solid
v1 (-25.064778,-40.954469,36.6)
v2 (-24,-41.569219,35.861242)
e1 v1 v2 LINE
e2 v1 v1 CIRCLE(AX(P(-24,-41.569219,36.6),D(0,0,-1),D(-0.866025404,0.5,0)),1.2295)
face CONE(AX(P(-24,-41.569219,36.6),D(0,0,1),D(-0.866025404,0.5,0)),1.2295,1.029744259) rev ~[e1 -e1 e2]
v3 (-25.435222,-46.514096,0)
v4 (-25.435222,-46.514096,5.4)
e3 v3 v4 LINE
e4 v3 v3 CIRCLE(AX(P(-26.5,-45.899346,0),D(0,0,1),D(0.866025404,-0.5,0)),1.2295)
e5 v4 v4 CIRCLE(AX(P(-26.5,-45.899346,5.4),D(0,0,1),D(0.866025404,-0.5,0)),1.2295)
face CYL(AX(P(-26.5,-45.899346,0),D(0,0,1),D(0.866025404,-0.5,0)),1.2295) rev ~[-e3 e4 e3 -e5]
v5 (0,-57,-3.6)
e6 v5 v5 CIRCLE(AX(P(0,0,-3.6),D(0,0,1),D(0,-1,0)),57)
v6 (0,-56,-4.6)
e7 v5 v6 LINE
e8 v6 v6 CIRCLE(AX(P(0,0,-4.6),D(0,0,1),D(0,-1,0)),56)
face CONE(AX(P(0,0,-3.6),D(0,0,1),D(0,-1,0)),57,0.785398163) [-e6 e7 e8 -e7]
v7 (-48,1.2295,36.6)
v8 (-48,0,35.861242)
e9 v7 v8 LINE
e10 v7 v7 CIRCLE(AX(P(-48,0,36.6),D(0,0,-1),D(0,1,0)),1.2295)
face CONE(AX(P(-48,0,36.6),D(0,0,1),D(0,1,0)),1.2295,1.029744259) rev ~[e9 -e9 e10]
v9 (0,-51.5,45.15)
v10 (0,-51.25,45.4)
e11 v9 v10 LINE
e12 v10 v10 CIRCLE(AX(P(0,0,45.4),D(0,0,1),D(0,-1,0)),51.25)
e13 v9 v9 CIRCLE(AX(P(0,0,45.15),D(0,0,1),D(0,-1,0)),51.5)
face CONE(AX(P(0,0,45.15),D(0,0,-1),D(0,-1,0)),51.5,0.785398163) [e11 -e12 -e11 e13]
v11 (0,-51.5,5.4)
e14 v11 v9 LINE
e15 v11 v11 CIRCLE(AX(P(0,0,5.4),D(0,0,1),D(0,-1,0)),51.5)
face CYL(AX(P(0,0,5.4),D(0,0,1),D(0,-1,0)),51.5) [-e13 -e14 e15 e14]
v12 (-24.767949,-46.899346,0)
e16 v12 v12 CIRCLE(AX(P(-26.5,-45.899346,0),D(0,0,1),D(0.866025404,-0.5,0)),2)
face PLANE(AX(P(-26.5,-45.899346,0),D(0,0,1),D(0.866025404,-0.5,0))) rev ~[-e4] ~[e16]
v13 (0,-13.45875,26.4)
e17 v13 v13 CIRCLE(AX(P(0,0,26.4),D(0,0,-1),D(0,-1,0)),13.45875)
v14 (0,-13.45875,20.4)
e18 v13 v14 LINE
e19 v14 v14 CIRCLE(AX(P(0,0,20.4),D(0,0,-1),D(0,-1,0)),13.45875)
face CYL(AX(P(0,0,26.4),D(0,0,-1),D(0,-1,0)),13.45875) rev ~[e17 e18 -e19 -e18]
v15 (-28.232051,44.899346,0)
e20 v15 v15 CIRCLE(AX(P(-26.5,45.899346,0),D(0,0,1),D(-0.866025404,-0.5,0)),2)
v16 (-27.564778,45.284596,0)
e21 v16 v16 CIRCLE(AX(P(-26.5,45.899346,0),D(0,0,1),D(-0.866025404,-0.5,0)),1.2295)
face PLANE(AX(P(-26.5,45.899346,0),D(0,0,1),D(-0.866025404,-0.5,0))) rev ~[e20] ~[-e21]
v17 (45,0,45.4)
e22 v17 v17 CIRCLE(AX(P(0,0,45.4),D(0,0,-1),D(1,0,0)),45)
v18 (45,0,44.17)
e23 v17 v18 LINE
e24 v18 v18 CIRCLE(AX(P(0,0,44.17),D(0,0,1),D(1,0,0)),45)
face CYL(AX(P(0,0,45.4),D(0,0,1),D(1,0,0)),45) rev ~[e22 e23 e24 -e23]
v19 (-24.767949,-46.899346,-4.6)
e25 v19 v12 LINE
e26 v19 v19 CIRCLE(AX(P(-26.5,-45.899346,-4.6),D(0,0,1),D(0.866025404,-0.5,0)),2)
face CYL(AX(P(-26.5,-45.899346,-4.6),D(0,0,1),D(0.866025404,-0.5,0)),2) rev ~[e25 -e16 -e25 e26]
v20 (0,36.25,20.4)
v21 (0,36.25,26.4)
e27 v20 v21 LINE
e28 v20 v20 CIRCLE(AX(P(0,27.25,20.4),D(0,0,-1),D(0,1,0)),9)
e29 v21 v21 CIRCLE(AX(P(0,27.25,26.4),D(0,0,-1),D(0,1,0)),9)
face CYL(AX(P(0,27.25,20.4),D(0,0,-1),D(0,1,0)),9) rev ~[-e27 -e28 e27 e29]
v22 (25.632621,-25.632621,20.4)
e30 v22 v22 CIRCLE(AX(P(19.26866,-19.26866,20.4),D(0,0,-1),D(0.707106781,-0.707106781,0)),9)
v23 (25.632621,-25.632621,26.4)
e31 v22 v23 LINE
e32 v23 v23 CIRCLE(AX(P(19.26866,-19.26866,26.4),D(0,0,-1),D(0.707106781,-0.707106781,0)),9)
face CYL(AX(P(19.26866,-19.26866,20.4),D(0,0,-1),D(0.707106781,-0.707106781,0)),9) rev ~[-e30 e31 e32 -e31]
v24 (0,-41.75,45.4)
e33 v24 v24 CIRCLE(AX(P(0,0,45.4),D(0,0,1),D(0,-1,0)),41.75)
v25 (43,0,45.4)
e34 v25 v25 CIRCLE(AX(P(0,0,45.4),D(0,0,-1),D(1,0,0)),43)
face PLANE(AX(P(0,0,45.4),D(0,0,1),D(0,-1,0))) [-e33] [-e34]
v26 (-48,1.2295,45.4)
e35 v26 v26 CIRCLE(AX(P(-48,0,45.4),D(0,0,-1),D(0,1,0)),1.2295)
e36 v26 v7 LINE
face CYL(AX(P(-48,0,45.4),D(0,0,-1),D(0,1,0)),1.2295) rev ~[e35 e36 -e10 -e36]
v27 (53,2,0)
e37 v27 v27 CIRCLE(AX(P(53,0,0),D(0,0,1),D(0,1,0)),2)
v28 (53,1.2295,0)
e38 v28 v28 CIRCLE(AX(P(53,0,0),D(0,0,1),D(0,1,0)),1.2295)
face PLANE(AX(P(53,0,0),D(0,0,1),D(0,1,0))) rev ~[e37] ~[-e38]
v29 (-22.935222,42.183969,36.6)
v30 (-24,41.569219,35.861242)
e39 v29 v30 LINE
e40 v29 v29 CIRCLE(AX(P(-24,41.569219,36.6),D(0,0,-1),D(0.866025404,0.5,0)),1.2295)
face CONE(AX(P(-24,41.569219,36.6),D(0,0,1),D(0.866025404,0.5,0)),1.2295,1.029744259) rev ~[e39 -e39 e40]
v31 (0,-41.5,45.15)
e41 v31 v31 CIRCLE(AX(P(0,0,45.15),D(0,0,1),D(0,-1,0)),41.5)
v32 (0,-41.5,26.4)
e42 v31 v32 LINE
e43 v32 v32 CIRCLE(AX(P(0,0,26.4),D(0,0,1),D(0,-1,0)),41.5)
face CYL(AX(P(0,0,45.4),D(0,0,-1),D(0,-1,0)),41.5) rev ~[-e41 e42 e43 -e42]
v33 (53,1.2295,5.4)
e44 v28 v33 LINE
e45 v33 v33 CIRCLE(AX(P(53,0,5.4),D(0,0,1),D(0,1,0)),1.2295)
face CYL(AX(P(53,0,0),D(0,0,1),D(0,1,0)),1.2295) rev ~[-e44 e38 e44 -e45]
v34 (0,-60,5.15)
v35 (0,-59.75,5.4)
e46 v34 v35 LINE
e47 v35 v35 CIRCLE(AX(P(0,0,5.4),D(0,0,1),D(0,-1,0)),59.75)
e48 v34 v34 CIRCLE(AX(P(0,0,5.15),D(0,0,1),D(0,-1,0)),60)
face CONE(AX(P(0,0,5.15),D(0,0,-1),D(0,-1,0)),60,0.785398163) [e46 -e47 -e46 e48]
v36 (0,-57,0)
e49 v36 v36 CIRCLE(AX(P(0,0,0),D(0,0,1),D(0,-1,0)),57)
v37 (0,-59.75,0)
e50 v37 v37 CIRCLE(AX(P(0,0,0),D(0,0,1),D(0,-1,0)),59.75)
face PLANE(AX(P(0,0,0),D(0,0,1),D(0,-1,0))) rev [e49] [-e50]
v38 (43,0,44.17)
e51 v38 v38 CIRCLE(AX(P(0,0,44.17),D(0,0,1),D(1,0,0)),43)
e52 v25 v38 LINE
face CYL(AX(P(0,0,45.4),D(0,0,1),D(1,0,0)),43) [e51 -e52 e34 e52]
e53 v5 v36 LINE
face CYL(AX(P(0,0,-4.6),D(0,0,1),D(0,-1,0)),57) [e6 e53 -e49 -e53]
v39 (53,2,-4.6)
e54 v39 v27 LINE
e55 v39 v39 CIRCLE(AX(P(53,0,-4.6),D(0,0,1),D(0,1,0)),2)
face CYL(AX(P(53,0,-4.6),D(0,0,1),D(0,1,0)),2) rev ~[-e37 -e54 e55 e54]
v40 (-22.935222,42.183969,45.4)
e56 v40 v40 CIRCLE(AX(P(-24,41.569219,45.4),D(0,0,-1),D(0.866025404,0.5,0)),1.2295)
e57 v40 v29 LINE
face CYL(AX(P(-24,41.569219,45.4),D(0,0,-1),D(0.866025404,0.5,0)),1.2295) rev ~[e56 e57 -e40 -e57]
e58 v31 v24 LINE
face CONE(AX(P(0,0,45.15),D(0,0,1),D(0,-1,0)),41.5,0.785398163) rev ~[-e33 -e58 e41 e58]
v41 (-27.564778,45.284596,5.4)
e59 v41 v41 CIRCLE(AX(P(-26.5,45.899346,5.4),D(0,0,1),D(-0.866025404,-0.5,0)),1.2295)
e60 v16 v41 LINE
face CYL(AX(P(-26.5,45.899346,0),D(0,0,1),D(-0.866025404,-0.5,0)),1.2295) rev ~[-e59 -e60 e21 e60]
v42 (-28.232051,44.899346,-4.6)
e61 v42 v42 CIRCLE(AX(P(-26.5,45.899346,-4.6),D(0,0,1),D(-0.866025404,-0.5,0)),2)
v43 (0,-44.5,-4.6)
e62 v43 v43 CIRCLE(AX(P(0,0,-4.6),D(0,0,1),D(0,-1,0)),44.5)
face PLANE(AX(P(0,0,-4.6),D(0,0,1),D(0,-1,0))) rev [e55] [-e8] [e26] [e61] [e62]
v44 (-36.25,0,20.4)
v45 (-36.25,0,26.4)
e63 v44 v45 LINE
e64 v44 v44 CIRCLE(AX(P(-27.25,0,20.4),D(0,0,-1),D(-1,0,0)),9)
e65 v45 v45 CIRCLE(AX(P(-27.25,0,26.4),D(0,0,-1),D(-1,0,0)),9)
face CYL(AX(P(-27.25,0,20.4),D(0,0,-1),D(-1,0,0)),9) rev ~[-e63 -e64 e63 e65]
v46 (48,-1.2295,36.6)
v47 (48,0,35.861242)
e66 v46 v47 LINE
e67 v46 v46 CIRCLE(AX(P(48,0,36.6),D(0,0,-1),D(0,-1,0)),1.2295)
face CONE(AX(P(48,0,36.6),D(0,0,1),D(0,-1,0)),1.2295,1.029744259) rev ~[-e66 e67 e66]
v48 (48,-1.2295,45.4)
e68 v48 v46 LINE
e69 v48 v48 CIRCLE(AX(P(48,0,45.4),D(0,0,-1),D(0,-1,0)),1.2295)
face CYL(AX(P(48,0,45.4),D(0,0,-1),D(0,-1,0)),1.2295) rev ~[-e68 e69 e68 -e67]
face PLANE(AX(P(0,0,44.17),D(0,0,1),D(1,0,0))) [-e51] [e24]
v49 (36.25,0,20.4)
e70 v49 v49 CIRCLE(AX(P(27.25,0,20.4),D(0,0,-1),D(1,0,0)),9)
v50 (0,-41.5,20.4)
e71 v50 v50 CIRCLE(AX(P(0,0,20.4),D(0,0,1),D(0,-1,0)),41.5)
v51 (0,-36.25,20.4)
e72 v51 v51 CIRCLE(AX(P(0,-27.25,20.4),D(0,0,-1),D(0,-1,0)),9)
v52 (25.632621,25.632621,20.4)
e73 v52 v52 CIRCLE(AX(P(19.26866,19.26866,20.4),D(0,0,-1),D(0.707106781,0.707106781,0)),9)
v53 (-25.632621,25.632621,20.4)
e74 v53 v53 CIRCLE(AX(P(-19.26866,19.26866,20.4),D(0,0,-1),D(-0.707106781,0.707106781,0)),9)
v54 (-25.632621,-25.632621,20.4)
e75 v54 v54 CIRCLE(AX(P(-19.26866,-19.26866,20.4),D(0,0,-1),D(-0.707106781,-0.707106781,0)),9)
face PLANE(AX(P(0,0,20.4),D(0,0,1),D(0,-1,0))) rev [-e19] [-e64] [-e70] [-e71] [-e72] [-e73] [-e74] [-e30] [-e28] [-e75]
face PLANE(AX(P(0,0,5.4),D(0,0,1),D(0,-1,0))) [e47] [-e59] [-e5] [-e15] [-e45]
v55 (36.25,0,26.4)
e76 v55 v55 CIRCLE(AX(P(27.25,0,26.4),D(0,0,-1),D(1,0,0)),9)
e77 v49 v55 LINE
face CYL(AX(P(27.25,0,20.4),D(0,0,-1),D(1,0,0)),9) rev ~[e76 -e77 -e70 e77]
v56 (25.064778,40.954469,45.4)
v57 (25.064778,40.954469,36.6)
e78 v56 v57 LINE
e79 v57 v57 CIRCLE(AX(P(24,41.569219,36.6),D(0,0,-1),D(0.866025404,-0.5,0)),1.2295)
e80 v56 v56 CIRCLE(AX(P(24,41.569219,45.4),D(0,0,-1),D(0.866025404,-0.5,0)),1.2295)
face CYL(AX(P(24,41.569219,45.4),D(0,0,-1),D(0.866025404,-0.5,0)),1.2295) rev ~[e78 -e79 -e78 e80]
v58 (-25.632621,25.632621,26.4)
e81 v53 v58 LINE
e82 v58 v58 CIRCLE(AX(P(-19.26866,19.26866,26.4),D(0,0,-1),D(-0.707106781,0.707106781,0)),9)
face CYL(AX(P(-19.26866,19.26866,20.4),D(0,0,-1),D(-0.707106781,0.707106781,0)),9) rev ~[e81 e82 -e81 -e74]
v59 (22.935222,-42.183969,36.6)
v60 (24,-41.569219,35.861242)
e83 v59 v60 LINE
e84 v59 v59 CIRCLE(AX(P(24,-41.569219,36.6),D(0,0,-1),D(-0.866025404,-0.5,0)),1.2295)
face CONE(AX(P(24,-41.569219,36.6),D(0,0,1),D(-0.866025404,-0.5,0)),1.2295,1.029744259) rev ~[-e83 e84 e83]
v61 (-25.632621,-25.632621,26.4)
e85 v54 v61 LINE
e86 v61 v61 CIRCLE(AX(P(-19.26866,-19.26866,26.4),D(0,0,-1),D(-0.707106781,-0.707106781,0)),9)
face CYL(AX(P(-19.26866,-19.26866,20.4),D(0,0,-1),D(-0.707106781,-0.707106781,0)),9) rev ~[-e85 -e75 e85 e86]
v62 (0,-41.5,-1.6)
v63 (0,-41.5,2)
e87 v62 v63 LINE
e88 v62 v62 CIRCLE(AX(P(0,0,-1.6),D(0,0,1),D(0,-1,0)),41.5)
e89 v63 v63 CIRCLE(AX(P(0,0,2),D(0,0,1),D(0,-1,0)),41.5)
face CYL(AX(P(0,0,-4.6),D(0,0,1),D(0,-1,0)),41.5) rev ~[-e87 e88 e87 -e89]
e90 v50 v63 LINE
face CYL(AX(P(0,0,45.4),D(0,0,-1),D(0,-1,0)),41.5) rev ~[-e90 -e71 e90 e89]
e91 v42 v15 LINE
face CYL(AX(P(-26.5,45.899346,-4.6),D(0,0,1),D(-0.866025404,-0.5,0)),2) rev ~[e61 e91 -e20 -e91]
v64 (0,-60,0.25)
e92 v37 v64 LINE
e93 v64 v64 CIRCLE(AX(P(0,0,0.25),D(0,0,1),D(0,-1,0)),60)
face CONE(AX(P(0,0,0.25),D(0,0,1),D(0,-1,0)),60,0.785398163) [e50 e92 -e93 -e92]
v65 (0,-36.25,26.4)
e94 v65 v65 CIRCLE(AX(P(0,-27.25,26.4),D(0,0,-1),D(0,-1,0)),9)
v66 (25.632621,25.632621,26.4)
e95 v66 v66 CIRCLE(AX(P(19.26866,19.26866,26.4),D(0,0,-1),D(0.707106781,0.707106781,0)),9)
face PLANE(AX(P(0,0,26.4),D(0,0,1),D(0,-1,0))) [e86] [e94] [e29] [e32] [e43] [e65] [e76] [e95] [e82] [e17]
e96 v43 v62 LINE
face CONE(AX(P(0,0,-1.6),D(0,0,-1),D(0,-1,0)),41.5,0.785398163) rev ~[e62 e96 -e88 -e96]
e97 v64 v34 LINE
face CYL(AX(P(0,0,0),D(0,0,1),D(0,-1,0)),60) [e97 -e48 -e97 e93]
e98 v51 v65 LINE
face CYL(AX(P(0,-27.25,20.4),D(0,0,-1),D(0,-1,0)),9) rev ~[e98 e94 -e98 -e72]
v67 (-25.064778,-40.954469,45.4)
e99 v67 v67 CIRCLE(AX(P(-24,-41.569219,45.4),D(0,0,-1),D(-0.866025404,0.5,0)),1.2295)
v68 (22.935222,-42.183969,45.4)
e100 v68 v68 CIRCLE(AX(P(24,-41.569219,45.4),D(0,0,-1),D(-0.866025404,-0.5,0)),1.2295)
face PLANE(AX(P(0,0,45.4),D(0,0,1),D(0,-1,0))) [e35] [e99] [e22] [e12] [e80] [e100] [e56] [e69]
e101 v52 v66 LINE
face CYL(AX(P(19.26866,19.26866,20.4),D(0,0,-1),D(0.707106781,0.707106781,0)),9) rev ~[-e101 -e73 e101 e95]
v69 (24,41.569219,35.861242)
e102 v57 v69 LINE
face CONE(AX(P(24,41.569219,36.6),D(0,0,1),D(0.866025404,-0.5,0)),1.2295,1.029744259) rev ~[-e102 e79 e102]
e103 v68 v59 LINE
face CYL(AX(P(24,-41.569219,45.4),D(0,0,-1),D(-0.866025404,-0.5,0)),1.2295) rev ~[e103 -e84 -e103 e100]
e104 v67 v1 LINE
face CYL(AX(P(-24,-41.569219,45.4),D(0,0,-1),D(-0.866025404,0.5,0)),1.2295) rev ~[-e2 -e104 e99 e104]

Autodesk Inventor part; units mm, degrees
ref_plane "XZ Plane" through (0, 0, 0) normal (0, 1, 0) x (-1, 0, 0)
ref_plane "XY Plane" through (0, 0, 0) normal (0, 0, 1) x (1, 0, 0)
sketch "Sketch1" plane through (0, 0, 0) normal (1, 0, 0) x (0, 1, 0)
  line L0 (0, 0) -> (0, 16.4674) construction
  line L1 (-57, -4.6) -> (-57, 0)
  line L2 (-57, 0) -> (-60, 0)
  line L3 (-60, 0) -> (-60, 5.4)
  line L4 (-60, 5.4) -> (-44.45, 5.4)
  line L5 (-44.45, 5.4) -> (-44.45, 2)
  line L6 (-44.45, 2) -> (-41.5, 2)
  line L7 (-41.5, -4.6) -> (-57, -4.6)
  line L8 (-41.5, -4.6) -> (-41.5, 2)
  line L9 (-51.5, 5.4) -> (-51.5, 45.4)
  line L10 (-51.5, 45.4) -> (-41.5, 45.4)
  line L11 (-41.5, 45.4) -> (-41.5, 2)
  line L12 (-45, 45.4) -> (-45, 44.2)
  line L13 (-45, 44.2) -> (-43, 44.2)
  line L14 (-43, 44.2) -> (-43, 45.4)
  line L15 (-41.5, 26.4) -> (-13, 26.4)
  line L16 (-13, 26.4) -> (-13, 20.4)
  line L17 (-13, 20.4) -> (-41.5, 20.4)
  point P0 (-47.5615, 5.4)
  dimension "d2" = 4.6
  dimension "d3" = 10
  dimension "d8" = 88.9
  dimension "d9" = 120
  dimension "d20" = 114
  dimension "d40" = 2
  dimension "d44" = 83
  dimension "d45" = 50
  dimension "d46" = 10
  dimension "d68" = 86
  dimension "d69" = 2
  dimension "d70" = 1.2
  dimension "d81" = 6
  dimension "d82" = 25
  dimension "d83" = 26
revolve "Revolution1" add sketch "Sketch1" angle 360 about axis through (0, 0, 0) along (0, 0, 1)
chamfer "Chamfer4" distance 1 angle 45 1 edges at (0, 57, -4.6)
sketch "Sketch2" plane through (0, 0, -4.6) normal (0, 0, -1) x (-1, 0, 0)
  point P0 (0, 0)
  point P1 (-53, 0)
  dimension "d26" = 53
hole "Hole1" at (53, 0, -4.6) direction (0, 0, 1) diameter 2.459 end through all counterbore diameter 4 counterbore depth 4.6 thread size "M3x0.5" class "6H" standard "ANSI Metric M Profile"
pattern_circular "Circular Pattern1" count 3 over 360 about axis through (0, 0, 2.7) along (0, 0, 1) of "Hole1"
chamfer "Chamfer5" distance 3 angle 45 1 edges at (0, 41.5, -4.6)
sketch "Sketch3" plane through (0, 0, 45.4) normal (0, 0, 1) x (1, 0, 0)
  circle A0 centre (0, 0) radius 51.5 projected
  circle A1 centre (0, 0) radius 41.5 projected
  circle A2 centre (0, 0) radius 51.5 projected
  point P0 (48, 0)
  dimension "d65" = 48
hole "Hole2" at (48, 0, 45.4) direction (0, 0, -1) diameter 2.459 depth 8.8 tip angle 118 thread size "M3x0.5" class "6H" standard "ISO Metric profile"
pattern_circular "Circular Pattern2" count 6 over 360 about axis through (0, 0, 25.4) along (0, 0, 1) of "Hole2"
ref_plane "Work Plane1" through (-51.5, 0, 25.4) normal (1, 0, 0) x (0, 1, 0)
chamfer "Chamfer6" distance 0.25 angle 45 4 edges at (0, 51.5, 45.4) (0, 41.5, 45.4) (0, 60, 5.4) (0, 60, 0)
sketch "Sketch7" plane through (0, 0, 20.4) normal (0, 0, -1) x (-1, 0, 0)
  circle A0 centre (27.25, 0) radius 9
  circle A1 centre (0, 0) radius 41.5 projected
  circle A2 centre (0, 0) radius 13 projected
  circle A3 centre (0, 0) radius 41.5 projected
  line L0 (41.5, 0) -> (13, 0) construction
  dimension "d84" = 18
extrude "Extrusion3" cut sketch "Sketch7" against normal blind 10 contours A0
pattern_circular "Circular Pattern3" count 8 over 360 about axis through (0, 0, 23.4) along (0, 0, 1) of "Extrusion3"
sketch "Sketch8" plane through (0, 0, 26.4) normal (0, 0, 1) x (1, 0, 0)
  circle A0 centre (0, 0) radius 13 projected
hole "Hole4" at (0, 0, 26.4) direction (0, 0, -1) diameter 26.9175 end through all thread size "M28x1" class "6H" standard "ISO Metric profile"
sketch "Sketch9" plane through (0, 0, 45.4) normal (0, 0, 1) x (1, 0, 0)
  circle A0 centre (0, 0) radius 43
  circle A1 centre (0, 0) radius 45
  dimension "d97" = 86
  dimension "d98" = 2
extrude "Extrusion4" cut sketch "Sketch9" against normal blind 1.23
properties part number "021" material "Stainless Steel, 440C"
